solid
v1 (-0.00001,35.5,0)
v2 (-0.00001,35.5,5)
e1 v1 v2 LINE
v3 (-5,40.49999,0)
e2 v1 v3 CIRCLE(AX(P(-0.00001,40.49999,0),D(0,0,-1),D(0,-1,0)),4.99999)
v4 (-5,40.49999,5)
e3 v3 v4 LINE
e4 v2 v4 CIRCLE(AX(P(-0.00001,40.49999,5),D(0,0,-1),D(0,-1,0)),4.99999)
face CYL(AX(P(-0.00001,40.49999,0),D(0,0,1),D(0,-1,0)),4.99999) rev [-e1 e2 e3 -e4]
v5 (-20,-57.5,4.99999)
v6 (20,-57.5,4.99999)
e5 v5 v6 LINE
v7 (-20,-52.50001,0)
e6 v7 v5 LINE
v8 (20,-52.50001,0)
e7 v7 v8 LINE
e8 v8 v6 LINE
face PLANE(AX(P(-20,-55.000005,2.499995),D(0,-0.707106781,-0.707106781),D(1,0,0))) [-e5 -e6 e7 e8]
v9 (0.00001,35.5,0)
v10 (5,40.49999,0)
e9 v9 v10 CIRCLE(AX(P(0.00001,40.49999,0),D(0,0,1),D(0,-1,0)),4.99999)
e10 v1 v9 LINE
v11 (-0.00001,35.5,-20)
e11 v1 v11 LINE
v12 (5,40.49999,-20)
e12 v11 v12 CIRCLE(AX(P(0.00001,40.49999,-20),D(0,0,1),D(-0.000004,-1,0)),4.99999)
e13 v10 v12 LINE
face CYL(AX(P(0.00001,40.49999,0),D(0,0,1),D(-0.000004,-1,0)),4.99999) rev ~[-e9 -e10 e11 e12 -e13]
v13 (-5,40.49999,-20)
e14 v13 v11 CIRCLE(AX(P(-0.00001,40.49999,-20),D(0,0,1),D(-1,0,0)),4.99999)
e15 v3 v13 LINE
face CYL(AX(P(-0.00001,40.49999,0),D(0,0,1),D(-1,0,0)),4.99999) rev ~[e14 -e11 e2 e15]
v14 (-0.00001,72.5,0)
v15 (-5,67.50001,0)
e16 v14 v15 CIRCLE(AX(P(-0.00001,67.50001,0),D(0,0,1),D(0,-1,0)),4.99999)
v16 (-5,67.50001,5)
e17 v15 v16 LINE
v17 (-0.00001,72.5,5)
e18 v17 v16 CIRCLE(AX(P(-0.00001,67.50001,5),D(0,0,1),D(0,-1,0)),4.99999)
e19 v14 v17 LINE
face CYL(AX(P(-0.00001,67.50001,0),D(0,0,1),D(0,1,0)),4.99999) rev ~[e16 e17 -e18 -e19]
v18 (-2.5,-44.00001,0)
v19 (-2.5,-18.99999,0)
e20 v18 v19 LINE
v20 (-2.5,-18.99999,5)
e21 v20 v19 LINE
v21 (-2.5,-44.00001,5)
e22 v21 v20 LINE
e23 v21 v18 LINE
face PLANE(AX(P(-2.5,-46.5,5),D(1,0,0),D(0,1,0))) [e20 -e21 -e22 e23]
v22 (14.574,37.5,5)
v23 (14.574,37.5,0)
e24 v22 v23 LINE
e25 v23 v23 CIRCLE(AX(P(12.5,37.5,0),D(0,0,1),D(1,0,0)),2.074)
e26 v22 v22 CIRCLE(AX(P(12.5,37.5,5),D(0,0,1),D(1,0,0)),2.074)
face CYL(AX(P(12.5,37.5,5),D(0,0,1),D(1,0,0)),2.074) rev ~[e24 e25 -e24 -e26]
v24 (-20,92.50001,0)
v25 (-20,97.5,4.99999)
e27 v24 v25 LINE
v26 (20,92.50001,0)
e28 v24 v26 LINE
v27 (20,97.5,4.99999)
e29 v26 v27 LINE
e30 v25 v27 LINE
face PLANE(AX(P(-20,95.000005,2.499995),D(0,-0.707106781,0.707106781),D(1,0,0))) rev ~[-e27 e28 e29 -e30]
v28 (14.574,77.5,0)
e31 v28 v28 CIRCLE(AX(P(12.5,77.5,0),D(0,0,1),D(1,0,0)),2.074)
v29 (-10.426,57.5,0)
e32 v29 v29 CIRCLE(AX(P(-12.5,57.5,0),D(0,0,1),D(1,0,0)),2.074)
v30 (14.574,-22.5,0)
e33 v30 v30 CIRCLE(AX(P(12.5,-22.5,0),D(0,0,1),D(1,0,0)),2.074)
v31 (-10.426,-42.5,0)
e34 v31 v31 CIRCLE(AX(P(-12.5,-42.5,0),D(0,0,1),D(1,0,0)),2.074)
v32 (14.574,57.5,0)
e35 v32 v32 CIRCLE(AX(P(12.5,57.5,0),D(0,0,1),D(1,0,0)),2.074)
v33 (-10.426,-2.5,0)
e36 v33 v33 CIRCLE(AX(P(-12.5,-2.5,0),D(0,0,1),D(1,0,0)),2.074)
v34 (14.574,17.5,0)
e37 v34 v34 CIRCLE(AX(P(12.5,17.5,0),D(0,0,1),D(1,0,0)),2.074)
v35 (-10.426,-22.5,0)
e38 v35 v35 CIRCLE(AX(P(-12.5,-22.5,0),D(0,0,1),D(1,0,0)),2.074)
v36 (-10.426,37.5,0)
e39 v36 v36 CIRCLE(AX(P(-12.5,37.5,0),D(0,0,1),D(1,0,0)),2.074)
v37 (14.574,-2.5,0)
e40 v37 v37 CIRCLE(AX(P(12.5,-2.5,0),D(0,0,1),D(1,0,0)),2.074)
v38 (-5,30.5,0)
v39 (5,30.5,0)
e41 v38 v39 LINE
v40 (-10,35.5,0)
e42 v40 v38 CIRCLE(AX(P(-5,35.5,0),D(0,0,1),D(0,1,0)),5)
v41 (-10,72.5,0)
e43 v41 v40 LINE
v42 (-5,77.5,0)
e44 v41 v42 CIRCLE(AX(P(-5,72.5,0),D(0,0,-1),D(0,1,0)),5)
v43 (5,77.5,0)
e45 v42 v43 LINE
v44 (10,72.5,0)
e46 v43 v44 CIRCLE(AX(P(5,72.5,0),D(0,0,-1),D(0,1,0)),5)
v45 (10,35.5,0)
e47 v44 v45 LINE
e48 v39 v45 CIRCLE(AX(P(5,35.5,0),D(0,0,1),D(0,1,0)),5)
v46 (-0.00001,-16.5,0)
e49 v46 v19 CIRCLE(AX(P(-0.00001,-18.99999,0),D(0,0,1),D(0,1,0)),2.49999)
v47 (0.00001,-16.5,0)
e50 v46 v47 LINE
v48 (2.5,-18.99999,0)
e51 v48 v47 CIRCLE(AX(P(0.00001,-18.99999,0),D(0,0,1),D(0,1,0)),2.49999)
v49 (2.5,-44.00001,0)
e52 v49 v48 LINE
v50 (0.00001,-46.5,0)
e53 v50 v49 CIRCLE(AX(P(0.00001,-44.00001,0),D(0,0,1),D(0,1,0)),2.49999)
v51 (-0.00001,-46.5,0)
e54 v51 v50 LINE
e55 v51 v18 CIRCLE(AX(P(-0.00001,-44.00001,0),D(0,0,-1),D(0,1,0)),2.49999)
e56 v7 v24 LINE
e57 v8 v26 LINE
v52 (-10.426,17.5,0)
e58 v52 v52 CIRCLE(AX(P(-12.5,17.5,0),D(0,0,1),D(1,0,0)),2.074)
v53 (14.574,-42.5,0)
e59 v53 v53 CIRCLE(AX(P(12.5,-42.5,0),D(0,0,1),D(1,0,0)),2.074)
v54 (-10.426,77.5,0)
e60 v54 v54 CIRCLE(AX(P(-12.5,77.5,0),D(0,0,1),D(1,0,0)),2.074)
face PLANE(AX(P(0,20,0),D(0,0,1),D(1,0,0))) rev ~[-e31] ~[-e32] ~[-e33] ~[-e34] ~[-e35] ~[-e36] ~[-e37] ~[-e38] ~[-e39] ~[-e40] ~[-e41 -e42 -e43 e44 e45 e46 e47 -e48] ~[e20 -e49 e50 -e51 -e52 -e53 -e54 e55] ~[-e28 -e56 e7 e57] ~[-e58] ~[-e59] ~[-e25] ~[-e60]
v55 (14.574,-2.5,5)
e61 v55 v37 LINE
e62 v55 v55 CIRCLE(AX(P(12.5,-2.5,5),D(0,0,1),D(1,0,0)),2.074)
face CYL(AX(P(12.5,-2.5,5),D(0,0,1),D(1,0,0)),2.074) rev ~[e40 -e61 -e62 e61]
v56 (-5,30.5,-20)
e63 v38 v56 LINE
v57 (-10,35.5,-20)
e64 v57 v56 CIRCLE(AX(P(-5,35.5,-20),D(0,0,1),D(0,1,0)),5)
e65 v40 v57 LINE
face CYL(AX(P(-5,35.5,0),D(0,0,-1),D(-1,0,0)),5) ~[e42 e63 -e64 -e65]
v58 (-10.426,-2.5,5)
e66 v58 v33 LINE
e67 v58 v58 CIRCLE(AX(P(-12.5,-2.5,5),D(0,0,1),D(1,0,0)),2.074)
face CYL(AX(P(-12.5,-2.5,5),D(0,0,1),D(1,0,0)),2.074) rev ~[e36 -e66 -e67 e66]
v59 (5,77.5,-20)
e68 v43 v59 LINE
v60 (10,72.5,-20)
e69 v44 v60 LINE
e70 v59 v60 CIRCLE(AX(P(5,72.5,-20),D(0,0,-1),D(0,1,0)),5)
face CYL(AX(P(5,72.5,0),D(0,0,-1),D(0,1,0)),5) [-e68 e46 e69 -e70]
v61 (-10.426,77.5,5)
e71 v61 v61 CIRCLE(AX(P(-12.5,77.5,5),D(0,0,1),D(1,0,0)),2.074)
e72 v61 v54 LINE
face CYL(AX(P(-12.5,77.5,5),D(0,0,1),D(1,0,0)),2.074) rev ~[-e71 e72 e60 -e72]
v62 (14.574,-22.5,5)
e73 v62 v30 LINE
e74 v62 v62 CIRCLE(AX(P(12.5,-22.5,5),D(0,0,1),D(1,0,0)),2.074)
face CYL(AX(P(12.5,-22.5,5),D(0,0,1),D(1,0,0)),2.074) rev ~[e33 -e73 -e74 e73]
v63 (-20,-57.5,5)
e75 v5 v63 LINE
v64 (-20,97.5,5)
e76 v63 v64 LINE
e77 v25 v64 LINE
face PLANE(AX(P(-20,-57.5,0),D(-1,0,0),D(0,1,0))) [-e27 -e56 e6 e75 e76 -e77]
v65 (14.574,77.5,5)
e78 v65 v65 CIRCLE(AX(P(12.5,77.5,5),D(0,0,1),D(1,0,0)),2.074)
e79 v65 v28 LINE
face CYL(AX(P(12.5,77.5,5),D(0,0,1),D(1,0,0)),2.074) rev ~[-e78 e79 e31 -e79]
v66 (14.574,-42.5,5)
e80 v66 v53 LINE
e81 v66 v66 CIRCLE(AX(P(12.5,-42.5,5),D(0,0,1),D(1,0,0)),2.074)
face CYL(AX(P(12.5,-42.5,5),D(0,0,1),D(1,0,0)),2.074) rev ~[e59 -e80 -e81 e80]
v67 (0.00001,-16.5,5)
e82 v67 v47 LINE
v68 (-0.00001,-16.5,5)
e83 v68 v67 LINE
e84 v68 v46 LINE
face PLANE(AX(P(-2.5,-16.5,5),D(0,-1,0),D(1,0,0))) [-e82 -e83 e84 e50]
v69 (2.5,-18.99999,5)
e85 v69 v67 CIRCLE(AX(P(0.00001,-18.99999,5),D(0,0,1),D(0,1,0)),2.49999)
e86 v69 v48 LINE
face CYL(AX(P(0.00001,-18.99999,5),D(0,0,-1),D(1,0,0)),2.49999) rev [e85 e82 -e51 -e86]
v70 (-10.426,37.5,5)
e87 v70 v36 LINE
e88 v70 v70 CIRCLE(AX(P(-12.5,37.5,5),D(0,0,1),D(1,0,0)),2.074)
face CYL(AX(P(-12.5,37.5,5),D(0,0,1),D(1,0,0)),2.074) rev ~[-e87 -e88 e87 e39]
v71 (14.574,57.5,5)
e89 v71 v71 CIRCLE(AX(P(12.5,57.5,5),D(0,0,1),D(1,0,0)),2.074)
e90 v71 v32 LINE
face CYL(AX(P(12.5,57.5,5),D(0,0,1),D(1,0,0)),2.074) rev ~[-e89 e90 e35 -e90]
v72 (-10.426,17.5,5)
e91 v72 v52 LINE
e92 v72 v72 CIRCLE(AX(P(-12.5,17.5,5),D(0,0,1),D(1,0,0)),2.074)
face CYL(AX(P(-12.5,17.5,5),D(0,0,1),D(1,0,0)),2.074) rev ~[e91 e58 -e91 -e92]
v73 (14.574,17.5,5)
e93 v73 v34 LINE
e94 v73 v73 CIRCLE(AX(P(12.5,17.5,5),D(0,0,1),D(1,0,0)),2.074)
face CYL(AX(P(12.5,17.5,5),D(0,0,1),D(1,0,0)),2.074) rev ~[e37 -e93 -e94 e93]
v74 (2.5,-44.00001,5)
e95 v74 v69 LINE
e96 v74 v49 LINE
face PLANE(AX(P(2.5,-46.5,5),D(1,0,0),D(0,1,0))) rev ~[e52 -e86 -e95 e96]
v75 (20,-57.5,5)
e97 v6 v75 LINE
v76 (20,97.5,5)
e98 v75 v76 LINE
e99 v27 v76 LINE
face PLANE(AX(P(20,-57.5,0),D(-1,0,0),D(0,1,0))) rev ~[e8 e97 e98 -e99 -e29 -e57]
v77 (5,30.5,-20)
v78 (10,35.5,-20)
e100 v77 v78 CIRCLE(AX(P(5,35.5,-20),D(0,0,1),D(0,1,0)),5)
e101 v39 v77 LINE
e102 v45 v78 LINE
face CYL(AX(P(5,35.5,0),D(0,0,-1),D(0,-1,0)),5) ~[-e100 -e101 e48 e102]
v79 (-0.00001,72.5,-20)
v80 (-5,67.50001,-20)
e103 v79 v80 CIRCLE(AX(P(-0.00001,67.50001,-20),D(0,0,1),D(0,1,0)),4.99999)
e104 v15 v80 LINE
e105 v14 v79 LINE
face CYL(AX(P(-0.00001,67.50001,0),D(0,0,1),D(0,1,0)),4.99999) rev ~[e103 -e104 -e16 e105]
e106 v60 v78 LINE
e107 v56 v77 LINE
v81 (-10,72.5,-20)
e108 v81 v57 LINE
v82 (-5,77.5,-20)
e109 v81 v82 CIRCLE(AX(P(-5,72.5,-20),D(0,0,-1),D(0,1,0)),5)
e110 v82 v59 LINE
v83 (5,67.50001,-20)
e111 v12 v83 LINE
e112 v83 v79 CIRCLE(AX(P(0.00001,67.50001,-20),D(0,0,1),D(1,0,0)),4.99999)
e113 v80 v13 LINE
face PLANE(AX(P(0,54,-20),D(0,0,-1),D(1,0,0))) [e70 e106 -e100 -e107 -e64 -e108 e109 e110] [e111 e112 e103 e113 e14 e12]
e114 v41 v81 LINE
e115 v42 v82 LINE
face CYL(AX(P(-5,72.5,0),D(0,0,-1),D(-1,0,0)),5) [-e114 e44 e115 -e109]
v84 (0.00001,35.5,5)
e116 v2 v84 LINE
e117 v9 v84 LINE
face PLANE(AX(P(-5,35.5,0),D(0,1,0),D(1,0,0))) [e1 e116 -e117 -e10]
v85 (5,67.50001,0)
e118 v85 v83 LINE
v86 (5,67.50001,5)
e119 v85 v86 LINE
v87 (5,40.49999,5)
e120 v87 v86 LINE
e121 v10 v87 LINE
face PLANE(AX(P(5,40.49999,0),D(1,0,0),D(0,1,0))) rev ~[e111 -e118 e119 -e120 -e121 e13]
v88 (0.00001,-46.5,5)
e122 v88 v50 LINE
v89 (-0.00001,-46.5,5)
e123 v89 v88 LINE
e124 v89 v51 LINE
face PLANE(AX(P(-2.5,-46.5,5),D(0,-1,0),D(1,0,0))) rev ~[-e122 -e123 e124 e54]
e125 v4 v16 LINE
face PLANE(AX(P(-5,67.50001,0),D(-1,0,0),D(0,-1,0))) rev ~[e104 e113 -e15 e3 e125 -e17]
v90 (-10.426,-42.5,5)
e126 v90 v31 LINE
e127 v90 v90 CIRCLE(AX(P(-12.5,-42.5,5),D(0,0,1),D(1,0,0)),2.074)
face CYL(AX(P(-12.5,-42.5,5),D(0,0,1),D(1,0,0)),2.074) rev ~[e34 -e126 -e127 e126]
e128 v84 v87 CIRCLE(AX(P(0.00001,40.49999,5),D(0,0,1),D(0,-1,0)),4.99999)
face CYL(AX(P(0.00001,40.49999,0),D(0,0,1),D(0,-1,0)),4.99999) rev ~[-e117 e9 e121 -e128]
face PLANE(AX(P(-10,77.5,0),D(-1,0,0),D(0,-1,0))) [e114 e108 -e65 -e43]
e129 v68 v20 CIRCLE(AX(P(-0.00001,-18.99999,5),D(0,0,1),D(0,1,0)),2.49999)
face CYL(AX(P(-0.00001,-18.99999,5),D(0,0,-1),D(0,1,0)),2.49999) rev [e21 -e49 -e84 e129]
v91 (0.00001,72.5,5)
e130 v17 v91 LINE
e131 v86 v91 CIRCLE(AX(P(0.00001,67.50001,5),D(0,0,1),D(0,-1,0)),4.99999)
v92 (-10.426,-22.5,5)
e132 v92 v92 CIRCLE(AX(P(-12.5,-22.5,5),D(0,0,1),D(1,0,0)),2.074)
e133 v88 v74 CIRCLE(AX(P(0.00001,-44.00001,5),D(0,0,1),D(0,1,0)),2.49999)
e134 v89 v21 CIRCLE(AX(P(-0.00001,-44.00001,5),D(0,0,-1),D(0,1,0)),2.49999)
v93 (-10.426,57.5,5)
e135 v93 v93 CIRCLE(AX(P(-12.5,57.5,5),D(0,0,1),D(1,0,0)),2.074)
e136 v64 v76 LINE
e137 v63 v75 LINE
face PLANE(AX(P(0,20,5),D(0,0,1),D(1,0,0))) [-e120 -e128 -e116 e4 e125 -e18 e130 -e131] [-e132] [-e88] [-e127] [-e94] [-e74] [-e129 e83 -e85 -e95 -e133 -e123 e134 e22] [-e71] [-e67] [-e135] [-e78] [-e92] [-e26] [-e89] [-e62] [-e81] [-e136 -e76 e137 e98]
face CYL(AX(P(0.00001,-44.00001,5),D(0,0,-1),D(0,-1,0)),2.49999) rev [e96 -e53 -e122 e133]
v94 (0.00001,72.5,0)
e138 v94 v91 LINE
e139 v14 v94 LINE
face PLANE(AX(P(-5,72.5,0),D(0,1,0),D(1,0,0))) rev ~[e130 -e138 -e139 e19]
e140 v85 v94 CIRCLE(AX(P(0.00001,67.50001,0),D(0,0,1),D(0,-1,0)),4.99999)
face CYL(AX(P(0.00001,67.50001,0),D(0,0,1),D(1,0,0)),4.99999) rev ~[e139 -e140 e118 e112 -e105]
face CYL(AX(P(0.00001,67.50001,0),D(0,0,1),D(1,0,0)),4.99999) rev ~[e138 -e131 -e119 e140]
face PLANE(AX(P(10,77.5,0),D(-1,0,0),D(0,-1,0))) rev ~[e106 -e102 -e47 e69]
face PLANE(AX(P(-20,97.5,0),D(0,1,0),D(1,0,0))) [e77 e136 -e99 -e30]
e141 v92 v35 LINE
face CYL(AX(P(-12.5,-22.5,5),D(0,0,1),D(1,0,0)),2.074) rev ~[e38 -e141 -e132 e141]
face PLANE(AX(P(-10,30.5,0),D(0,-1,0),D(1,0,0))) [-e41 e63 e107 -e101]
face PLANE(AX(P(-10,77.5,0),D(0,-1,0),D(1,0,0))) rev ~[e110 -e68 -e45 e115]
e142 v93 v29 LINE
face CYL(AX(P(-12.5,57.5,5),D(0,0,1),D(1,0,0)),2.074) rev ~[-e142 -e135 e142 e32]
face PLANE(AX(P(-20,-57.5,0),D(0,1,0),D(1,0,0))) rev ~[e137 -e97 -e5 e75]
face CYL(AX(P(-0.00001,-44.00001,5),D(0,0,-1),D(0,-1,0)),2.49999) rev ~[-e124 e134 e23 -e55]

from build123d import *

# Parameters (mm, degrees)
F0_W      = 40
F0_H      = 155
F0_W_2    = 10
F0_H_2    = 37
F1_DEPTH  = 5
F2_R      = 4.99999
F3_W      = 20
F3_H      = 47
F4_DEPTH  = 20
F5_R      = 5
F6_SIZE   = 4.99999
F7_R      = 2.074
F8_DEPTH  = 25.001
F9_W      = 5
F9_H      = 30
F10_DEPTH = 25.001
F11_R     = 2.49999


# Not quite as in the source:
# - a fillet or chamfer is up to 0.001 mm smaller than in the source, because OpenCascade refuses the exact size
# - ends of sketch curves that miss each other by under 0.0002 mm in the source are joined


with BuildPart() as f1:
    # F0 (on Top) → F1 (new body)
    with BuildSketch(Plane.XY):
        with Locations((0, 20)):
            Rectangle(F0_W, F0_H)
        with Locations((0, 54)):
            Rectangle(F0_W_2, F0_H_2, mode=Mode.SUBTRACT)
    extrude(amount=F1_DEPTH)

    # F2 (radius 5 in the source; OpenCascade refuses exactly that, so slightly less here)
    f2_edges = [f1.edges().sort_by_distance(p)[0] for p in [
        (5, 72.5, 2.5),
        (-5, 72.5, 2.5),
        (5, 35.5, 2.5),
        (-5, 35.5, 2.5),
    ]]
    fillet(f2_edges, radius=F2_R)

    # F3 (on face) → F4 (join)
    with BuildSketch(Plane(origin=(0, 0, 0), x_dir=(1, 0, 0), z_dir=(0, 0, -1))):
        with Locations((0, -54)):
            Rectangle(F3_W, F3_H)
        with BuildLine():
            ThreePointArc((-1e-05, -72.5), (-3.5355368349, -71.0355368349), (-5, -67.50001))
            Line((-5, -67.50001), (-5, -40.49999))
            ThreePointArc((-5, -40.49999), (-3.5355368349, -36.9644631651), (-1e-05, -35.5))
            ThreePointArc((-1e-05, -35.5), (3.5355368349, -36.9644631651), (5, -40.49999))
            Line((5, -40.49999), (5, -67.50001))
            ThreePointArc((5, -67.50001), (3.5355368349, -71.0355368349), (-1e-05, -72.5))
        make_face(mode=Mode.SUBTRACT)
    extrude(amount=F4_DEPTH)

    # F5
    f5_edges = [f1.edges().sort_by_distance(p)[0] for p in [
        (-10, 30.5, -10),
        (10, 30.5, -10),
        (-10, 77.5, -10),
        (10, 77.5, -10),
    ]]
    fillet(f5_edges, radius=F5_R)

    # F6 (size 5 in the source; OpenCascade refuses exactly that, so slightly less here)
    f6_edges = [f1.edges().sort_by_distance(p)[0] for p in [
        (0, 97.5, 0),
        (0, -57.5, 0),
    ]]
    chamfer(f6_edges, length=F6_SIZE)

    # F7 (on face) → F8 (cut, through all)
    with BuildSketch(Plane.XY.offset(5)):
        with Locations((-12.5, -42.5)):
            Circle(F7_R)
        with Locations((12.5, -42.5)):
            Circle(F7_R)
        with Locations((-12.5, -22.5)):
            Circle(F7_R)
        with Locations((12.5, -22.5)):
            Circle(F7_R)
        with Locations((-12.5, -2.5)):
            Circle(F7_R)
        with Locations((12.5, -2.5)):
            Circle(F7_R)
        with Locations((-12.5, 17.5)):
            Circle(F7_R)
        with Locations((12.5, 17.5)):
            Circle(F7_R)
        with Locations((-12.5, 37.5)):
            Circle(F7_R)
        with Locations((12.5, 37.5)):
            Circle(F7_R)
        with Locations((12.5, 57.5)):
            Circle(F7_R)
        with Locations((-12.5, 57.5)):
            Circle(F7_R)
        with Locations((12.5, 77.5)):
            Circle(F7_R)
        with Locations((-12.5, 77.5)):
            Circle(F7_R)
    extrude(amount=-F8_DEPTH, mode=Mode.SUBTRACT)

    # F9 (on face) → F10 (cut, through all)
    with BuildSketch(Plane.XY.offset(5)):
        with Locations((0, -31.5)):
            Rectangle(F9_W, F9_H)
    extrude(amount=-F10_DEPTH, mode=Mode.SUBTRACT)

    # F11 (radius 2.5 in the source; OpenCascade refuses exactly that, so slightly less here)
    f11_edges = [f1.edges().sort_by_distance(p)[0] for p in [
        (-2.5, -46.5, 2.5),
        (2.5, -46.5, 2.5),
        (-2.5, -16.5, 2.5),
        (2.5, -16.5, 2.5),
    ]]
    fillet(f11_edges, radius=F11_R)


solid = f1.part
